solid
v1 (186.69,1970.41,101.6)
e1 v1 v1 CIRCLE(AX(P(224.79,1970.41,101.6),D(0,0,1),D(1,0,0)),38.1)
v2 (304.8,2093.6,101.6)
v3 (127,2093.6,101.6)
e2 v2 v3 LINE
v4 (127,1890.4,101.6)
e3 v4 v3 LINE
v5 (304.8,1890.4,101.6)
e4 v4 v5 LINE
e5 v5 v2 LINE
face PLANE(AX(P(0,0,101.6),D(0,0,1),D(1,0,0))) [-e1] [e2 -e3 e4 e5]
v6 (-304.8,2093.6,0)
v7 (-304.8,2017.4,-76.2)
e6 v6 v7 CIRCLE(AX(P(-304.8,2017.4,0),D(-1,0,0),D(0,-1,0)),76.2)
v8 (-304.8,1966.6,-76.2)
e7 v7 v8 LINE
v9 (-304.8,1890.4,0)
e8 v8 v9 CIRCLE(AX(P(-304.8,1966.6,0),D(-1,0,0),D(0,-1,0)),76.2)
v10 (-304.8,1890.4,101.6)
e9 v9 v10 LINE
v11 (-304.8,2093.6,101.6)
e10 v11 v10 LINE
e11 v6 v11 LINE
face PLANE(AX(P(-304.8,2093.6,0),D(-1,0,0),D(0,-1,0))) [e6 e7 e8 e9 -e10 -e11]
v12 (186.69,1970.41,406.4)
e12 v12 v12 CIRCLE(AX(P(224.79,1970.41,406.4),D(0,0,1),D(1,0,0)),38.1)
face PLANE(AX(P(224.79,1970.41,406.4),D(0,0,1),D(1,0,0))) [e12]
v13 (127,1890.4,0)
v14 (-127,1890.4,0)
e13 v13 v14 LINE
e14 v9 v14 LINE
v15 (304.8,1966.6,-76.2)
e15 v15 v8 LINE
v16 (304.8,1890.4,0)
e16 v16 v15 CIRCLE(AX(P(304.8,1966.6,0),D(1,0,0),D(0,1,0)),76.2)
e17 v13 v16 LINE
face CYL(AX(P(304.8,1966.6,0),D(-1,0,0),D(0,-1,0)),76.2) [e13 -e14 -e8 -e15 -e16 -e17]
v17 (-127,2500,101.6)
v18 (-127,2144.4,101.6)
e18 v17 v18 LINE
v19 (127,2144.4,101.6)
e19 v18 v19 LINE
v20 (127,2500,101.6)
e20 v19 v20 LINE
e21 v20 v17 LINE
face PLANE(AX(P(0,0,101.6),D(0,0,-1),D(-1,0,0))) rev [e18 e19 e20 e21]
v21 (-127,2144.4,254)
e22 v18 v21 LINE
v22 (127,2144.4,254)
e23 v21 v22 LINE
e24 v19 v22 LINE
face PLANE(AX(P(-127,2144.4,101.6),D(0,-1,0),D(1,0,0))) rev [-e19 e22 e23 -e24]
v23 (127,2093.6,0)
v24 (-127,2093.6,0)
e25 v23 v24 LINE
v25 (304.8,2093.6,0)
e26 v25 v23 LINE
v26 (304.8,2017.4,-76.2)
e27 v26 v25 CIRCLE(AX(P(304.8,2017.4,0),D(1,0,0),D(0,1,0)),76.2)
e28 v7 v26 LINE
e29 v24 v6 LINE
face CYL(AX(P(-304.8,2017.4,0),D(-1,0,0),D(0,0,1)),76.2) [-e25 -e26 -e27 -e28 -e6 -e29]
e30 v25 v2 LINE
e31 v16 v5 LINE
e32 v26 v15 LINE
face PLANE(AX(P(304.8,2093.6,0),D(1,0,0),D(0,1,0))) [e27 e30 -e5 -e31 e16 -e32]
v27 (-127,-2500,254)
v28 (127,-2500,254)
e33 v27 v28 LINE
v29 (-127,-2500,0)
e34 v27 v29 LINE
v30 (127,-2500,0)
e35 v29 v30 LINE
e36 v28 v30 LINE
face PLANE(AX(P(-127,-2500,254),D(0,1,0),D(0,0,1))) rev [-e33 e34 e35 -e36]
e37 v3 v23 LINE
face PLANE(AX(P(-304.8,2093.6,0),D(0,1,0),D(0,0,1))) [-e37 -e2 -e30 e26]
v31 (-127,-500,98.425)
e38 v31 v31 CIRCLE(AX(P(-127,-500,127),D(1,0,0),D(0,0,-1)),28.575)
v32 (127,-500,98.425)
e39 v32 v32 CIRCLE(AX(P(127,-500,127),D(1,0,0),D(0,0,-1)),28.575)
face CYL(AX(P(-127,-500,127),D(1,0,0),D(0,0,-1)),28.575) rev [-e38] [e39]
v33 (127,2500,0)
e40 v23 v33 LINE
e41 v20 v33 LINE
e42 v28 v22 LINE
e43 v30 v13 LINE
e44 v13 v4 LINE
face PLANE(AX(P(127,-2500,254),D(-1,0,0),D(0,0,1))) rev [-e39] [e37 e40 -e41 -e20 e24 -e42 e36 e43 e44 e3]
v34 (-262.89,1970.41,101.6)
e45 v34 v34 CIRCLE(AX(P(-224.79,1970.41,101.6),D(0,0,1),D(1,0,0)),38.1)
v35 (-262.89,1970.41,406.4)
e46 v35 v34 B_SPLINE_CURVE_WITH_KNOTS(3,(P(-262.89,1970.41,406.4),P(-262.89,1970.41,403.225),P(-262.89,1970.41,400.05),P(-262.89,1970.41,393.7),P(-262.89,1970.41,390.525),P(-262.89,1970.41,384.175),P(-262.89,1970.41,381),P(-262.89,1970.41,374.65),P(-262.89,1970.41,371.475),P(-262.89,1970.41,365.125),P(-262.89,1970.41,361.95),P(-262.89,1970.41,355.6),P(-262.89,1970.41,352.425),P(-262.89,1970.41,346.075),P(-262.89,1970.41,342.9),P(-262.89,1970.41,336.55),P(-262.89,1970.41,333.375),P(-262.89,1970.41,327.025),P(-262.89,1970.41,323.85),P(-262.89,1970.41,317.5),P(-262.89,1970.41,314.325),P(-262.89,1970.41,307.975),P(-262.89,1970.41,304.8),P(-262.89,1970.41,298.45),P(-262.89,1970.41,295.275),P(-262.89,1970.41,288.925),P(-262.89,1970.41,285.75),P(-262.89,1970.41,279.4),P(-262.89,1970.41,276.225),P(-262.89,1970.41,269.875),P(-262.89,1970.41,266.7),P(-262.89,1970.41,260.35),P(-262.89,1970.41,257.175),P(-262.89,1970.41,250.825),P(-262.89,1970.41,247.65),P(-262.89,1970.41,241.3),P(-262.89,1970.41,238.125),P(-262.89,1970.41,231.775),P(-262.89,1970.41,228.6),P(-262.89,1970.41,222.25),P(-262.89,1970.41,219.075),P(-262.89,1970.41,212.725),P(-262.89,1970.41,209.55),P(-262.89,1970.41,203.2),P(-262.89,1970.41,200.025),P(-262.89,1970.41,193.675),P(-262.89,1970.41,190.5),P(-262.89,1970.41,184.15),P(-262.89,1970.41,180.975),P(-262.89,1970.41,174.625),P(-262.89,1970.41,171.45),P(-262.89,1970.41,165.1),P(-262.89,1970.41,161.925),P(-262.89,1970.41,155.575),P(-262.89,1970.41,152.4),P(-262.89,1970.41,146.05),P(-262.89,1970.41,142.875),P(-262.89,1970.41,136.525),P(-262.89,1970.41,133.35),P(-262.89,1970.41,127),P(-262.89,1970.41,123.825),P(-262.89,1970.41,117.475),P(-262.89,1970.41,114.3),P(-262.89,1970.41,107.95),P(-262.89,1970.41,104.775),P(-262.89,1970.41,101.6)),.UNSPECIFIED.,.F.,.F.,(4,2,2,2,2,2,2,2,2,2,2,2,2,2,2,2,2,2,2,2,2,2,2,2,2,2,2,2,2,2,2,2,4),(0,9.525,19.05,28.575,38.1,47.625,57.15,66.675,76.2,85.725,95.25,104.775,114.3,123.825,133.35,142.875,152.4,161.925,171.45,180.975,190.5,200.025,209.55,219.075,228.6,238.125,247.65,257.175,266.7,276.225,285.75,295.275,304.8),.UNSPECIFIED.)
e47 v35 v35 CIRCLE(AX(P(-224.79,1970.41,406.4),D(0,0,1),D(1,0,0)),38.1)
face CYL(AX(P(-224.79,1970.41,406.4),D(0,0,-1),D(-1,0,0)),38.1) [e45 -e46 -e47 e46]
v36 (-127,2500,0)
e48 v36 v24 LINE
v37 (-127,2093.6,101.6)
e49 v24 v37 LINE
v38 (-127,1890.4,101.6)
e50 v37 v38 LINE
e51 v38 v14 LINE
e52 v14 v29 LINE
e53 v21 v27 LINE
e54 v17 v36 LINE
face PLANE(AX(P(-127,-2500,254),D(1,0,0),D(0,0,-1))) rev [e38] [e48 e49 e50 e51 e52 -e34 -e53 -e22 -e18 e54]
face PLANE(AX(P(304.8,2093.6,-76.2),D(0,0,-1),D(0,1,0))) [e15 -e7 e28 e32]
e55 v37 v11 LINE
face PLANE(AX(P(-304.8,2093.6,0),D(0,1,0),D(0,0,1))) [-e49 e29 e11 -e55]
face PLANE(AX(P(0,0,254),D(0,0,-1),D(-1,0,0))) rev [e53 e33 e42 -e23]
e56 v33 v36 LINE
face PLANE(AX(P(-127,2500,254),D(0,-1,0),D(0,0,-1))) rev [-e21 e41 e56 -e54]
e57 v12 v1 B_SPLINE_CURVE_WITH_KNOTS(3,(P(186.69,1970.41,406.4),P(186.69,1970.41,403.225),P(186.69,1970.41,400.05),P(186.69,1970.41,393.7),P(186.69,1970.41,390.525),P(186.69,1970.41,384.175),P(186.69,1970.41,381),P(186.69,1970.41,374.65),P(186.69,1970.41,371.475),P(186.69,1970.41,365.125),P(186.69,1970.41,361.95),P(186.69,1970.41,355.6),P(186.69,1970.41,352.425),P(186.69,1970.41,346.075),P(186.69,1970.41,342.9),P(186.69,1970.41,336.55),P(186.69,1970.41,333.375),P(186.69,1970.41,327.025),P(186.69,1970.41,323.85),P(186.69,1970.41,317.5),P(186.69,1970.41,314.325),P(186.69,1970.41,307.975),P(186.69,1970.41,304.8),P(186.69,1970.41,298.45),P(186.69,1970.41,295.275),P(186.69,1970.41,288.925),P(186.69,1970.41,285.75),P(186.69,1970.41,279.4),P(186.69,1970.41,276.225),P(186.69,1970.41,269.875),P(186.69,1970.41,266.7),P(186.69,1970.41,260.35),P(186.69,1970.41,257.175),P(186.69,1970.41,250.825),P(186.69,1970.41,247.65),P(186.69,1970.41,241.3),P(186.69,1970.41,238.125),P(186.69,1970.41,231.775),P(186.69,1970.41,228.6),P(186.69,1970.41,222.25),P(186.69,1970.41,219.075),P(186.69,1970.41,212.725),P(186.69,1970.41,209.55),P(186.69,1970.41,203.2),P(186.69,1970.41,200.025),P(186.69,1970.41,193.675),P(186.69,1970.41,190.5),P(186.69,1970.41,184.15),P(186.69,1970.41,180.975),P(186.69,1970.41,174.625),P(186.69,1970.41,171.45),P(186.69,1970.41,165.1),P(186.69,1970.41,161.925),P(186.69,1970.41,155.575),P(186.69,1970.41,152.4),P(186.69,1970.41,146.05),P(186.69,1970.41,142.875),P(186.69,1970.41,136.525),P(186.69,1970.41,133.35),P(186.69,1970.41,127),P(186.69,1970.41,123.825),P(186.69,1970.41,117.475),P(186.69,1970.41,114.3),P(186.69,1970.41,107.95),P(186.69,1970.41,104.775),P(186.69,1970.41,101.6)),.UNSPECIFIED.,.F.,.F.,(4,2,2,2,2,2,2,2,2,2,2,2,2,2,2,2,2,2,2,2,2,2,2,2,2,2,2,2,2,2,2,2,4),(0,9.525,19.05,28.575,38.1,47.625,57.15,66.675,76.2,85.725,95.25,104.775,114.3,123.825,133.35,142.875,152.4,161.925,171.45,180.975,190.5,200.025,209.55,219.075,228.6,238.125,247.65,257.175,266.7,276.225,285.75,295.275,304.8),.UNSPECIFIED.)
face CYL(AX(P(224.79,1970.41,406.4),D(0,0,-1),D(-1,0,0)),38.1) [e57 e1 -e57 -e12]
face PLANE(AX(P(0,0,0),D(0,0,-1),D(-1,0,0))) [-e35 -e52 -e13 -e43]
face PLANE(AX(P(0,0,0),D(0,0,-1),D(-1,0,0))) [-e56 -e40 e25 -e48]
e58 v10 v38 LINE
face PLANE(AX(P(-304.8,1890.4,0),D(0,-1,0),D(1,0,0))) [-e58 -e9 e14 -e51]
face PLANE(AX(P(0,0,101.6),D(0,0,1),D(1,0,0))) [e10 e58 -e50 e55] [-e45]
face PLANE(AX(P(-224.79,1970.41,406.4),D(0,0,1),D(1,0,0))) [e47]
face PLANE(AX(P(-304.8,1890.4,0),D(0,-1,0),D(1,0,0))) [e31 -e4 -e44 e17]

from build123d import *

# Parameters (mm, degrees)
SKETCH1_W           = 254
SKETCH1_H           = 5000
BOSS_EXTRUDE1_DEPTH = 254
SKETCH2_R           = 28.575
CUT_EXTRUDE1_DEPTH  = 2526.674563359
SKETCH4_W           = 254
SKETCH4_H           = 355.6
CUT_EXTRUDE2_DEPTH  = 152.4
BOSS_EXTRUDE2_START = -152.4
SKETCH5_W           = 609.6
SKETCH5_H           = 203.2
BOSS_EXTRUDE2_DEPTH = 101.6
SKETCH8_W           = 76.2
SKETCH8_H           = 203.2
BOSS_EXTRUDE3_DEPTH = 609.6
FILLET1_START       = -304.8
FILLET1_DEPTH       = 609.6
SKETCH9_R           = 38.1
BOSS_EXTRUDE4_DEPTH = 304.8


with BuildPart() as part:
    # Sketch1 → Boss-Extrude1 (new body)
    with BuildSketch(Plane.XY):
        Rectangle(SKETCH1_W, SKETCH1_H)
    extrude(amount=BOSS_EXTRUDE1_DEPTH)

    # Sketch2 → Cut-Extrude1 (cut, through all)
    with BuildSketch(Plane(origin=(127, 0, 0), x_dir=(0, 0, -1), z_dir=(1, 0, 0))):
        with Locations((-127, -500)):
            Circle(SKETCH2_R)
    extrude(amount=-CUT_EXTRUDE1_DEPTH, mode=Mode.SUBTRACT)

    # Sketch4 → Cut-Extrude2 (cut)
    with BuildSketch(Plane.XY.offset(254)):
        with Locations((0, 2322.2)):
            Rectangle(SKETCH4_W, SKETCH4_H)
    extrude(amount=-CUT_EXTRUDE2_DEPTH, mode=Mode.SUBTRACT)

    # Sketch5 → Boss-Extrude2 (add)
    with BuildSketch(Plane.XY.offset(254).offset(BOSS_EXTRUDE2_START)):
        with Locations((0, 1992)):
            Rectangle(SKETCH5_W, SKETCH5_H)
    extrude(amount=-BOSS_EXTRUDE2_DEPTH)

    # Sketch8 → Boss-Extrude3 (add)
    with BuildSketch(Plane.ZY.offset(304.8)):
        with Locations((-38.1, 1992)):
            Rectangle(SKETCH8_W, SKETCH8_H)
    extrude(amount=-BOSS_EXTRUDE3_DEPTH)

    # Fillet1: read off the stored shape, not the designer's step
    # Fillet1 outline → Fillet1 (cut)
    with BuildSketch(Plane.YZ.offset(FILLET1_START)):
        with BuildLine():
            Line((1890.4, -76.2), (1966.6, -76.2))
            ThreePointArc((1966.6, -76.2), (1912.718463274, -53.881536726), (1890.4, 0))
            Line((1890.4, 0), (1890.4, -76.2))
        make_face()
        with BuildLine():
            ThreePointArc((2093.6, 0), (2071.281536726, -53.881536726), (2017.4, -76.2))
            Line((2017.4, -76.2), (2093.6, -76.2))
            Line((2093.6, -76.2), (2093.6, 0))
        make_face()
    extrude(amount=FILLET1_DEPTH, mode=Mode.SUBTRACT)

    # Sketch9 → Boss-Extrude4 (add)
    with BuildSketch(Plane.XY.offset(101.6)):
        with Locations(Location((-224.79, 1970.41, 0), (0, 0, 180))):
            Circle(SKETCH9_R)
        with Locations(Location((224.79, 1970.41, 0), (0, 0, 180))):
            Circle(SKETCH9_R)
    extrude(amount=BOSS_EXTRUDE4_DEPTH)


solid = part.part
